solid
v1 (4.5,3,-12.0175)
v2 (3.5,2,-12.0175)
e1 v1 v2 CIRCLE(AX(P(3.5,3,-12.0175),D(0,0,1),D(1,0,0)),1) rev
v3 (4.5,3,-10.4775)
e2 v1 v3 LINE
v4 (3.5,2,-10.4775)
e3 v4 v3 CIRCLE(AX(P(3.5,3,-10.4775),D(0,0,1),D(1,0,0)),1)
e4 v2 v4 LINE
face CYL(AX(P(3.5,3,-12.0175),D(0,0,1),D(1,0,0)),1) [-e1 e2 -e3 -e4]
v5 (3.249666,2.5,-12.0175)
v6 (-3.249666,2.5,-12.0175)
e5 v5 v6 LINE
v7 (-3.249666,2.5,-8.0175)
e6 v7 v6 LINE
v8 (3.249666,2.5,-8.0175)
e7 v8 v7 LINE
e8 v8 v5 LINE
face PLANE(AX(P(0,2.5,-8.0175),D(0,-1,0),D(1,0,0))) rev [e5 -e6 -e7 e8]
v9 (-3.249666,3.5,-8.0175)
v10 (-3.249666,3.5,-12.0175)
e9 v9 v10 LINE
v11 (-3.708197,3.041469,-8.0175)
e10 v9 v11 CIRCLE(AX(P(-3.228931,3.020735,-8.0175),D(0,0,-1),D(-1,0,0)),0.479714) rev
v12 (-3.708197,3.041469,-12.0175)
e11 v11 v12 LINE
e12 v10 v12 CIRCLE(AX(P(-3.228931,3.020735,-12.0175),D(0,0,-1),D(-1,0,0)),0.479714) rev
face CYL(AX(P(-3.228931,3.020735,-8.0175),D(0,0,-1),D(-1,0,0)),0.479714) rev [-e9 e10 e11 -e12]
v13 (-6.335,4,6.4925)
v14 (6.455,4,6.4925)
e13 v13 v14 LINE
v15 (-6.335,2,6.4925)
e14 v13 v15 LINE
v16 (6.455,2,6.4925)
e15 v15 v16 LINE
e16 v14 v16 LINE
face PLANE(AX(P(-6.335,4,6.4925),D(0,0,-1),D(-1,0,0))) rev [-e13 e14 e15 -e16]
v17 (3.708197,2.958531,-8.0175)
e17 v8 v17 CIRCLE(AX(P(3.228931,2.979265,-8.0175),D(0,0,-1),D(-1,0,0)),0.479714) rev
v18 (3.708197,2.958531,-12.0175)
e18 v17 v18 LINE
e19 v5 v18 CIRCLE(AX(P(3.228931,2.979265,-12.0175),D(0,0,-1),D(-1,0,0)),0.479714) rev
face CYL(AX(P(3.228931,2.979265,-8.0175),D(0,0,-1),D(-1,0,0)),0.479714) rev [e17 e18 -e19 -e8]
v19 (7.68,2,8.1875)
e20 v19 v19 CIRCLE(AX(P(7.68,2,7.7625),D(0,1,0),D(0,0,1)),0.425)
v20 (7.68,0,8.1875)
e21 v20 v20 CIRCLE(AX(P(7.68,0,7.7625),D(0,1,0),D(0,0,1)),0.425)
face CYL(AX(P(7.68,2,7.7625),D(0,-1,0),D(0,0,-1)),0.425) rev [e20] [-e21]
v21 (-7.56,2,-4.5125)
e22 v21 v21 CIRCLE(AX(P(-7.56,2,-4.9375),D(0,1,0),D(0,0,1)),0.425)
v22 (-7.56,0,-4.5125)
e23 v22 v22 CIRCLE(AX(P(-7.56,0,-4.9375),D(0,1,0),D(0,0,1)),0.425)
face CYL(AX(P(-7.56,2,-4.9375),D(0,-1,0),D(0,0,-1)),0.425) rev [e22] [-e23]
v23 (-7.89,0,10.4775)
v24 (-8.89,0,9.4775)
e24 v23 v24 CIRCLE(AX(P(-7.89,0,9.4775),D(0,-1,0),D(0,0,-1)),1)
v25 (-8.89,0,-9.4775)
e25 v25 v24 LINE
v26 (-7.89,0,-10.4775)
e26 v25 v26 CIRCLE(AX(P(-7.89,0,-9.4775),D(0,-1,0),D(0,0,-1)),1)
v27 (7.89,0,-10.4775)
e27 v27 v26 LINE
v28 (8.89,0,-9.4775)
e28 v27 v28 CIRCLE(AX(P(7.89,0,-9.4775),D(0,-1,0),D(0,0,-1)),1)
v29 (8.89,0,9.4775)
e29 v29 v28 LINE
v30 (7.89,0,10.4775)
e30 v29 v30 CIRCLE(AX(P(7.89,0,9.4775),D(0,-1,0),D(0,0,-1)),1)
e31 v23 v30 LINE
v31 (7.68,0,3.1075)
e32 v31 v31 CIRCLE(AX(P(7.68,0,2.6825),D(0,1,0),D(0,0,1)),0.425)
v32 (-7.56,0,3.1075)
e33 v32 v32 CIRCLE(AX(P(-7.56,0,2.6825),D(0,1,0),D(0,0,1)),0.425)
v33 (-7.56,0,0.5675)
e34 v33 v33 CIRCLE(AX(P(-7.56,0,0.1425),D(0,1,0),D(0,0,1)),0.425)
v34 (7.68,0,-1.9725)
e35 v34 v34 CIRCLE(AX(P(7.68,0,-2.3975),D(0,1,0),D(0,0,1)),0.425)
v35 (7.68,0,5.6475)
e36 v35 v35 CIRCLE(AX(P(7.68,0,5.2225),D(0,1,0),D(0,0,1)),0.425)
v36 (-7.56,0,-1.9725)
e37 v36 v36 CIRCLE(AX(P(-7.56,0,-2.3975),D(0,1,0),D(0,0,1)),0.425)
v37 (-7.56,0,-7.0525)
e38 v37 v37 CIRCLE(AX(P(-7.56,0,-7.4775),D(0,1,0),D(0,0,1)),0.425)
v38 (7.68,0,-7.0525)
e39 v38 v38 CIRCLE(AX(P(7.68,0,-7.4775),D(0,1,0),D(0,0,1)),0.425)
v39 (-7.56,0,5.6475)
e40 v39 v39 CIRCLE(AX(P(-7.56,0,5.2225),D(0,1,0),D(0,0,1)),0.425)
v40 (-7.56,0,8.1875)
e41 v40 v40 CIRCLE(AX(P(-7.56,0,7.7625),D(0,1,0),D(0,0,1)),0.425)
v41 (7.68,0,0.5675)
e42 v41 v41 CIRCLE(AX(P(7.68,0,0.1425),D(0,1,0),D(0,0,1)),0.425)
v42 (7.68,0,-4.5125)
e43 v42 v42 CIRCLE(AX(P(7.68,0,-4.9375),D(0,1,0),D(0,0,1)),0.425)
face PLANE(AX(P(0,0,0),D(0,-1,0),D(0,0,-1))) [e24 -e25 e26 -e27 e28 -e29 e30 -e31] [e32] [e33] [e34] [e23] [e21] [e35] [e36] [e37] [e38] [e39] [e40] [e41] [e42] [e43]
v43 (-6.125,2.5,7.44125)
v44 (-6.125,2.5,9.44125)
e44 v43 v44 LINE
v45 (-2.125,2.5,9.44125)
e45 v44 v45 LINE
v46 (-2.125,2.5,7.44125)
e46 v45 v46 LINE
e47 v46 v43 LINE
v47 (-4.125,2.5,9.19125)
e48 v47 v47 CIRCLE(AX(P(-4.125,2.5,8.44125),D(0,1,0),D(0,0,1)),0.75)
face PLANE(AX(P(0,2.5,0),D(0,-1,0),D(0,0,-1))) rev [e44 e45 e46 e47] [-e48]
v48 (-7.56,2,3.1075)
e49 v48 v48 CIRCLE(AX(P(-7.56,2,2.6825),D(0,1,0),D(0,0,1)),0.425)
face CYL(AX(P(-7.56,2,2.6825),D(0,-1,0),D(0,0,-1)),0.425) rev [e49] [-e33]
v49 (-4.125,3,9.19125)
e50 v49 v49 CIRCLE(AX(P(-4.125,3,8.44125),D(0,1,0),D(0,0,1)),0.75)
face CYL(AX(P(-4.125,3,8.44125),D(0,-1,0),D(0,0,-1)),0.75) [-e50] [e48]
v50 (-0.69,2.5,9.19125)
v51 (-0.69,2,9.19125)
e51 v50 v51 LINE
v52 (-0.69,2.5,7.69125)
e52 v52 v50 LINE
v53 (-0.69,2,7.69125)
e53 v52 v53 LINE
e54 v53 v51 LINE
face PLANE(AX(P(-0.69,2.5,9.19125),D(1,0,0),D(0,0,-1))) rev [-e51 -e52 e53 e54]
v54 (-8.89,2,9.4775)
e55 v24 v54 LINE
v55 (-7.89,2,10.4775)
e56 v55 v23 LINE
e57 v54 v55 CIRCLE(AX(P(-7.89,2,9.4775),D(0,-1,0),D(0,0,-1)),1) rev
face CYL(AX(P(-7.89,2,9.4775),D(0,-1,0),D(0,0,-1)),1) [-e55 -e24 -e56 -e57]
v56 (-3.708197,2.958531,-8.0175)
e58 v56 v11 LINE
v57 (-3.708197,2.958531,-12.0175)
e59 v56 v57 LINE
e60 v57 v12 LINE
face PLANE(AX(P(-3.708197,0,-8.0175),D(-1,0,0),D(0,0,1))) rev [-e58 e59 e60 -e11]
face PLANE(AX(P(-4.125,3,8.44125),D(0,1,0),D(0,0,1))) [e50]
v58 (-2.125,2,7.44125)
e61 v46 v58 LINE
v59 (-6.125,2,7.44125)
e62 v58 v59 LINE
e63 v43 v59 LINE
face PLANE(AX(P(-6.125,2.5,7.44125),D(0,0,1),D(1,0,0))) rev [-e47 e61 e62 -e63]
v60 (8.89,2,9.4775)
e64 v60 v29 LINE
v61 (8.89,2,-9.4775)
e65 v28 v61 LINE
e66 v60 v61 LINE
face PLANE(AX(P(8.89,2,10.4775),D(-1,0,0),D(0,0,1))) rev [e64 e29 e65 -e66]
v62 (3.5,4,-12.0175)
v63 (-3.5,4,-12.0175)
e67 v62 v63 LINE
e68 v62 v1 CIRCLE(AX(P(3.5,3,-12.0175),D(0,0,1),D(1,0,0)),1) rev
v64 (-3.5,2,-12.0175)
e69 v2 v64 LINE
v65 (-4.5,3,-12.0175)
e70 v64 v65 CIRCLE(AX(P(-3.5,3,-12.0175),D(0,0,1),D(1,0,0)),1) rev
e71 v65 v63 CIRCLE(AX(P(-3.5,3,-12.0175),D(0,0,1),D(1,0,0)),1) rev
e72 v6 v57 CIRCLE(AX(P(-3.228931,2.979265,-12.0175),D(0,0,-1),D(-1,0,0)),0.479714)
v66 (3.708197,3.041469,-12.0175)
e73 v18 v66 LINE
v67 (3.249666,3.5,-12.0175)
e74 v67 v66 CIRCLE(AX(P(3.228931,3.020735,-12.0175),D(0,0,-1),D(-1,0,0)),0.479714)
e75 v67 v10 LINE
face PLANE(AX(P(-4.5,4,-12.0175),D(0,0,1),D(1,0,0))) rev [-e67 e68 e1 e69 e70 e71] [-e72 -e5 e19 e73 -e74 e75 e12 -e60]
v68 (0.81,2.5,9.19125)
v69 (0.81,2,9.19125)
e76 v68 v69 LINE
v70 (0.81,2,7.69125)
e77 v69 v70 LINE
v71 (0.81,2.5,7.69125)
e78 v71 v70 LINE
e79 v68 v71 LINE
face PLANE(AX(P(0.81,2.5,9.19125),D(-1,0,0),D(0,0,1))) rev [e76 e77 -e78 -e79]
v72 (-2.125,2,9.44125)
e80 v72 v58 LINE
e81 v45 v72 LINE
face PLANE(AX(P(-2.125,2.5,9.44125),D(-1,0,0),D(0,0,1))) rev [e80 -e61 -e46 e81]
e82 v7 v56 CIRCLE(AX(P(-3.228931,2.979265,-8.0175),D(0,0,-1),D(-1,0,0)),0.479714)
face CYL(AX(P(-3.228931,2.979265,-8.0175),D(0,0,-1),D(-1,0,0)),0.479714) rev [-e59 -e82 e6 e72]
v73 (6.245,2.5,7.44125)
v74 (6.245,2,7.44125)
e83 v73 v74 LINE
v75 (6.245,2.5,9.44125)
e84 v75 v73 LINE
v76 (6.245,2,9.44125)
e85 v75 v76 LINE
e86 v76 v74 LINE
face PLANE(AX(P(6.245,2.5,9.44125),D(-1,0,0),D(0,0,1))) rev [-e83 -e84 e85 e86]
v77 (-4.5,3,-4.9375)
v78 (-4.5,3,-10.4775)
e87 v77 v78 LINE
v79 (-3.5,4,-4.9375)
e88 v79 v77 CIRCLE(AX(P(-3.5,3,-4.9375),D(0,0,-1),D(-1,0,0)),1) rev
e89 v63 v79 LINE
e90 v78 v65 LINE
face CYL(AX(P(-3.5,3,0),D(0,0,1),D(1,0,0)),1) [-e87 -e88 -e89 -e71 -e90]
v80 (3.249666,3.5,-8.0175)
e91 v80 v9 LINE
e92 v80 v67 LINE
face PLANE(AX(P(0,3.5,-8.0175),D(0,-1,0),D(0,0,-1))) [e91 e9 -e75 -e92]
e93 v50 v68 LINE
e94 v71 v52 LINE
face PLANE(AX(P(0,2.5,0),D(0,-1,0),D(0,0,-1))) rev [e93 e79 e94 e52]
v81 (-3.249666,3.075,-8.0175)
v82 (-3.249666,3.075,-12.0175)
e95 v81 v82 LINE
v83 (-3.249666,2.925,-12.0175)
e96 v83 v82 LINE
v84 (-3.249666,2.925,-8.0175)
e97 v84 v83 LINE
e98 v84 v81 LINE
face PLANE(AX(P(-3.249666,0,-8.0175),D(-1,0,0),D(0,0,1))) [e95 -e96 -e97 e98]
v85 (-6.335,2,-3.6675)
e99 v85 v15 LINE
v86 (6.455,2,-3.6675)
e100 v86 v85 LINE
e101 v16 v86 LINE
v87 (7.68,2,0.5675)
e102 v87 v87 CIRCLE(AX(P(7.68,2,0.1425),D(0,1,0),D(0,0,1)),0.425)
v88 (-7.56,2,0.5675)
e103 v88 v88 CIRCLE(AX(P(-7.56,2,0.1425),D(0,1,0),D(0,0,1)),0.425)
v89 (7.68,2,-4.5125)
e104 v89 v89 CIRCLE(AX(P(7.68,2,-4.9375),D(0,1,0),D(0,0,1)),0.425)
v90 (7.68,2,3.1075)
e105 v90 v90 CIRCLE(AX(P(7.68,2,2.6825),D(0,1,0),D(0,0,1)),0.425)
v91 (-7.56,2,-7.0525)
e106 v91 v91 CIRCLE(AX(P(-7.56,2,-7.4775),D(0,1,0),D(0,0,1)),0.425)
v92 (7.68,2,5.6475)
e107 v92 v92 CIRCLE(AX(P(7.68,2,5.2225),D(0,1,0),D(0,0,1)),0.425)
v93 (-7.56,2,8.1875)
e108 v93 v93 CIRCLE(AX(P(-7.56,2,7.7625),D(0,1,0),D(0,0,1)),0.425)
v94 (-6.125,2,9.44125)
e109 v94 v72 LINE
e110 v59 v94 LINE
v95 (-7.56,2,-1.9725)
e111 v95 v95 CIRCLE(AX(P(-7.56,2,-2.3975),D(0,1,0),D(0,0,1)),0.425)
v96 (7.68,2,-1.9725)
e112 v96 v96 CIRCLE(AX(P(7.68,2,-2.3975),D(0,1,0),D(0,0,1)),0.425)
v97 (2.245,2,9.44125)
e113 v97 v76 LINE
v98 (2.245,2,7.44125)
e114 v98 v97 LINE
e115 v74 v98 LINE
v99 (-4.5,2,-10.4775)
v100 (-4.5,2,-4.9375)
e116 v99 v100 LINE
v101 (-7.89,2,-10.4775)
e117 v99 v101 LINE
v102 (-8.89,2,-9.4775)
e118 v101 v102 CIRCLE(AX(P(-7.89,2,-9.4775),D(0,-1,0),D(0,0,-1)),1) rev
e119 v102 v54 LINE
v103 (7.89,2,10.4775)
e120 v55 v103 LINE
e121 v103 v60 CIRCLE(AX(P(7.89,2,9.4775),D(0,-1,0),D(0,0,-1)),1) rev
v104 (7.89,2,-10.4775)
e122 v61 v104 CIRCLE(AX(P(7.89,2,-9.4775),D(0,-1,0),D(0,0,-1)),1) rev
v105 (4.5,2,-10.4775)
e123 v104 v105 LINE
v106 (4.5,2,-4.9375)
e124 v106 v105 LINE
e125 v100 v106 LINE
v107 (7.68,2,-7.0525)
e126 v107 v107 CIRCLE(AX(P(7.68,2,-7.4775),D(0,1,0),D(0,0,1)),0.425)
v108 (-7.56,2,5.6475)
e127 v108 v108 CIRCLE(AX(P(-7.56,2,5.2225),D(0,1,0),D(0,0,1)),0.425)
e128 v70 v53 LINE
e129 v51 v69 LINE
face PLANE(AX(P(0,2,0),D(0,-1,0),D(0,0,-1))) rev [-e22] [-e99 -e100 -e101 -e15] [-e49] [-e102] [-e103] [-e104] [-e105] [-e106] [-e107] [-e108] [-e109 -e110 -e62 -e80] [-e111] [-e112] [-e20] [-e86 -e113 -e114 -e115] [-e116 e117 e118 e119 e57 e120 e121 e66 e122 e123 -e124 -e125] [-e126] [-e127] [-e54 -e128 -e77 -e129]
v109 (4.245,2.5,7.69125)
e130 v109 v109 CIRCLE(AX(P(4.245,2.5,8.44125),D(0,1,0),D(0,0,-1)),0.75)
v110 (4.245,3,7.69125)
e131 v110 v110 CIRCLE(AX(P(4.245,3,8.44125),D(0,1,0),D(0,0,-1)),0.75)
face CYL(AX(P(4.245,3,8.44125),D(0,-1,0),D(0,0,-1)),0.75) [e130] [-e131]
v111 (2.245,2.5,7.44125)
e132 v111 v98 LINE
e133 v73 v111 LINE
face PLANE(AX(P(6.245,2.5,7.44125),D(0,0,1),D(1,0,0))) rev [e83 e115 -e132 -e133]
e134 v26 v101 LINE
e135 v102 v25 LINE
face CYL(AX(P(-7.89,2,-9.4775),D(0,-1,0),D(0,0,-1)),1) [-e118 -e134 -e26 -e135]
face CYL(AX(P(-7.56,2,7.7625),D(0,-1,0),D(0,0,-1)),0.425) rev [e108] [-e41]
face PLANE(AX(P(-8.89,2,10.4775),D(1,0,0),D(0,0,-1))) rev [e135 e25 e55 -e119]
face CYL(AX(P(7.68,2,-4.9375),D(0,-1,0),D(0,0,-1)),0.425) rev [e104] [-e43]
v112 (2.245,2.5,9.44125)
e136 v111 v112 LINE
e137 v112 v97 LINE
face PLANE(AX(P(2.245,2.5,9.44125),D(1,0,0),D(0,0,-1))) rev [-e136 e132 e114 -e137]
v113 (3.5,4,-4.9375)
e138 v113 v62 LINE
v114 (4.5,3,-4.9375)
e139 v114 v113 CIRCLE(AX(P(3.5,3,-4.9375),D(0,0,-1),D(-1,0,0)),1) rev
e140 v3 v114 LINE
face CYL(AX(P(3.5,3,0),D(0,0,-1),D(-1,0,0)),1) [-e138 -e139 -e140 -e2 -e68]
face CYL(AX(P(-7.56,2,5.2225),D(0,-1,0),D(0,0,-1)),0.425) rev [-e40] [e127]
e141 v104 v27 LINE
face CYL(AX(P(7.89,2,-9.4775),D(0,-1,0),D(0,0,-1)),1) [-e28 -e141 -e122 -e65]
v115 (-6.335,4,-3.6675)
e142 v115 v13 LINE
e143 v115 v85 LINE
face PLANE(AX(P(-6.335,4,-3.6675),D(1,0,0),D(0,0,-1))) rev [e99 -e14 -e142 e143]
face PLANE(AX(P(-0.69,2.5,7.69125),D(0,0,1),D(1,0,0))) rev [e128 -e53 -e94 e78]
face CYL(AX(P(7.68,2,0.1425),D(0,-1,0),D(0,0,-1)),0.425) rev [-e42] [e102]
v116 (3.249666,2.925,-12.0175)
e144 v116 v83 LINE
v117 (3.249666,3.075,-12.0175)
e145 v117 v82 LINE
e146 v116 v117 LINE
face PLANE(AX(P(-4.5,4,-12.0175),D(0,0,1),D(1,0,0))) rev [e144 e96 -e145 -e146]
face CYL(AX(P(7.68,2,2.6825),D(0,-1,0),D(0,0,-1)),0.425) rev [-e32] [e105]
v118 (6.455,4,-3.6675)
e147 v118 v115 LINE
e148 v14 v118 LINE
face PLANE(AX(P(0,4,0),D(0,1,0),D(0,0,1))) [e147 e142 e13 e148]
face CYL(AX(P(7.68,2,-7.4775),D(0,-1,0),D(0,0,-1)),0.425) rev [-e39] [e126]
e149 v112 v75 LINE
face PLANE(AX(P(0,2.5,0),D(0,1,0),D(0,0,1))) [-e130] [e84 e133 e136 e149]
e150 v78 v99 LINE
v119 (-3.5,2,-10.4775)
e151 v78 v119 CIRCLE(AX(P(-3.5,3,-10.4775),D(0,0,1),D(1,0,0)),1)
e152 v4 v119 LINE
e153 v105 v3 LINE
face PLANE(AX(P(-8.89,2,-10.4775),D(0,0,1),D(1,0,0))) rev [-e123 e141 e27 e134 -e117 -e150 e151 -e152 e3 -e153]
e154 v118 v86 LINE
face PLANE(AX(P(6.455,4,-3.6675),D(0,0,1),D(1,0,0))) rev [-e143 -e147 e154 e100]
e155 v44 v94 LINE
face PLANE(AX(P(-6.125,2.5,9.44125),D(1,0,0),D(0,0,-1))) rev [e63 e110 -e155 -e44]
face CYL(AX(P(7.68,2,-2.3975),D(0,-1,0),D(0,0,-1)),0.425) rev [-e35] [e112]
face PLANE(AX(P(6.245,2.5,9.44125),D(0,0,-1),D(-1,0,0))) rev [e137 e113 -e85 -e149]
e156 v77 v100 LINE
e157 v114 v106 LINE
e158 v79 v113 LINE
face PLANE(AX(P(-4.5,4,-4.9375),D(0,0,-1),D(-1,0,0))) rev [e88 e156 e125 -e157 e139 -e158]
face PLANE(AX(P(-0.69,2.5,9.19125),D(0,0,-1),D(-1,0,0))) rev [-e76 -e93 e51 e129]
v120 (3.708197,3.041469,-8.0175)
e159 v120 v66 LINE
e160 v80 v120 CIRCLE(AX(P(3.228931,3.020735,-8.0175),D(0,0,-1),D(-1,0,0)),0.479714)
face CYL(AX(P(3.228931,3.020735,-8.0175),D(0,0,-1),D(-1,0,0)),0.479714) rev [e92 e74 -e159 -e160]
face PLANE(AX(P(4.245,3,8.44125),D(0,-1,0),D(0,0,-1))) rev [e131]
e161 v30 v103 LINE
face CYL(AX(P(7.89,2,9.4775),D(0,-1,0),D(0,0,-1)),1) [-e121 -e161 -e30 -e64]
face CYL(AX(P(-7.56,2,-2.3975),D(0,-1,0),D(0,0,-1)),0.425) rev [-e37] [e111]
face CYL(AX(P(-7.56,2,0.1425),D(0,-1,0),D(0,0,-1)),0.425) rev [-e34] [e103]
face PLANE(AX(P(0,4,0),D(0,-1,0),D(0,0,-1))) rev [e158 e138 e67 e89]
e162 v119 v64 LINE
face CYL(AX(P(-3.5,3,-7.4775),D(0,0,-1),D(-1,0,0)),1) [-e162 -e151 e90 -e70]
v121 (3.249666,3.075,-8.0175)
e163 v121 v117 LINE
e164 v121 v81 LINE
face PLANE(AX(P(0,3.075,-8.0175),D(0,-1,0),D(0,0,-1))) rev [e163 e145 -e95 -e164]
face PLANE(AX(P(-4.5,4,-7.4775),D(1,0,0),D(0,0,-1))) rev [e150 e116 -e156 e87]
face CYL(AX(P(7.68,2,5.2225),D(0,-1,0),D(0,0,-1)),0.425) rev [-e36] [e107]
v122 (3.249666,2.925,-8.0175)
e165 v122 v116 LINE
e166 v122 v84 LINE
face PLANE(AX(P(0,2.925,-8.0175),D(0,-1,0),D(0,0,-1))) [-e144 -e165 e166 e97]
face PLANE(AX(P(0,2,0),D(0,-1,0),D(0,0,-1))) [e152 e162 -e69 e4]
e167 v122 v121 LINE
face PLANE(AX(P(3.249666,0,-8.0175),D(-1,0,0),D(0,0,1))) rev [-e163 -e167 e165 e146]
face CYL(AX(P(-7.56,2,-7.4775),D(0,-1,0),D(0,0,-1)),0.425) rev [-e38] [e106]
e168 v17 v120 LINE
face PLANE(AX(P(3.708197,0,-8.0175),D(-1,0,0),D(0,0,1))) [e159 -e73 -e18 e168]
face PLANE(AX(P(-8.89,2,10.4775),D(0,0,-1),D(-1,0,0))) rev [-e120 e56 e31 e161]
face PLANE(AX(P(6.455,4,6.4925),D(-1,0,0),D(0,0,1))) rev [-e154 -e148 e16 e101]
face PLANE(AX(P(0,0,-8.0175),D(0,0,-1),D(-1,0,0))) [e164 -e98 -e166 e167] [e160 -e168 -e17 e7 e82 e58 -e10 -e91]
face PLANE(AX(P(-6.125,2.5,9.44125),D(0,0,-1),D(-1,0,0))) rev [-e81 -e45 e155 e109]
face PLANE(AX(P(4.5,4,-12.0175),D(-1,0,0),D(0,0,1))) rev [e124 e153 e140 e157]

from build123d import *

# Parameters (mm, degrees)
ESQUISSE1_W             = 17.78
ESQUISSE1_H             = 20.955
ESQUISSE1_R             = 0.425
BOSS_EXTRU_1_DEPTH      = 2
BOSS_EXTRU_2_DEPTH      = 2
CONG_1_R                = 1
ESQUISSE3_W             = 6.499332414
ESQUISSE3_H             = 0.15
ENL_V_MAT_EXTRU_1_DEPTH = 4
CONG_2_R                = 1
ESQUISSE4_W             = 12.79
ESQUISSE4_H             = 10.16
BOSS_EXTRU_3_DEPTH      = 2
ESQUISSE5_W             = 4
ESQUISSE5_H             = 2
ESQUISSE5_W_2           = 1.5
ESQUISSE5_H_2           = 1.5
BOSS_EXTRU_4_DEPTH      = 0.5
ESQUISSE6_R             = 0.75
BOSS_EXTRU_5_DEPTH      = 0.5


with BuildPart() as part:
    # Esquisse1 → Boss.-Extru.1 (new body)
    with BuildSketch(Plane(origin=(0, 0, 0), x_dir=(1, 0, 0), z_dir=(0, 1, 0))):
        Rectangle(ESQUISSE1_W, ESQUISSE1_H)
        with Locations(Location((-7.56, 7.4775, 0), (0, 0, 270))):
            Circle(ESQUISSE1_R, mode=Mode.SUBTRACT)
        with Locations(Location((7.68, 7.4775, 0), (0, 0, 270))):
            Circle(ESQUISSE1_R, mode=Mode.SUBTRACT)
        with Locations(Location((7.68, 4.9375, 0), (0, 0, 270))):
            Circle(ESQUISSE1_R, mode=Mode.SUBTRACT)
        with Locations(Location((7.68, 2.3975, 0), (0, 0, 270))):
            Circle(ESQUISSE1_R, mode=Mode.SUBTRACT)
        with Locations(Location((7.68, -0.1425, 0), (0, 0, 270))):
            Circle(ESQUISSE1_R, mode=Mode.SUBTRACT)
        with Locations(Location((7.68, -2.6825, 0), (0, 0, 270))):
            Circle(ESQUISSE1_R, mode=Mode.SUBTRACT)
        with Locations(Location((7.68, -5.2225, 0), (0, 0, 270))):
            Circle(ESQUISSE1_R, mode=Mode.SUBTRACT)
        with Locations(Location((7.68, -7.7625, 0), (0, 0, 270))):
            Circle(ESQUISSE1_R, mode=Mode.SUBTRACT)
        with Locations(Location((-7.56, 4.9375, 0), (0, 0, 270))):
            Circle(ESQUISSE1_R, mode=Mode.SUBTRACT)
        with Locations(Location((-7.56, 2.3975, 0), (0, 0, 270))):
            Circle(ESQUISSE1_R, mode=Mode.SUBTRACT)
        with Locations(Location((-7.56, -0.1425, 0), (0, 0, 270))):
            Circle(ESQUISSE1_R, mode=Mode.SUBTRACT)
        with Locations(Location((-7.56, -2.6825, 0), (0, 0, 270))):
            Circle(ESQUISSE1_R, mode=Mode.SUBTRACT)
        with Locations(Location((-7.56, -5.2225, 0), (0, 0, 270))):
            Circle(ESQUISSE1_R, mode=Mode.SUBTRACT)
        with Locations(Location((-7.56, -7.7625, 0), (0, 0, 270))):
            Circle(ESQUISSE1_R, mode=Mode.SUBTRACT)
    extrude(amount=BOSS_EXTRU_1_DEPTH)

    # Esquisse2 → Boss.-Extru.2 (add)
    with BuildSketch(Plane(origin=(0, 2, 0), x_dir=(1, 0, 0), z_dir=(0, 1, 0))):
        Polygon((-4.5, 12.0175), (4.5, 12.0175), (4.5, 7.4775), (4.5, 4.9375), (-4.5, 4.9375), (-4.5, 7.4775), align=None)
    extrude(amount=BOSS_EXTRU_2_DEPTH)

    # Congé1
    cong_1_edges = [part.edges().sort_by_distance(p)[0] for p in [
        (-4.5, 2, -11.2475),
        (4.5, 2, -11.2475),
        (-4.5, 4, -8.4775),
        (4.5, 4, -8.4775),
    ]]
    fillet(cong_1_edges, radius=CONG_1_R - 0.0001)  # a hair under: the kernel refuses the full size

    # Esquisse3 → Enlèv. mat.-Extru.1 (cut)
    with BuildSketch(Plane(origin=(0, 0, -12.0175), x_dir=(-1, 0, 0), z_dir=(0, 0, -1))):
        with BuildLine():
            ThreePointArc((-3.708196785, 2.958530578), (-3.568140241, 2.640056544), (-3.249666207, 2.5))
            Line((-3.249666207, 2.5), (3.249666207, 2.5))
            ThreePointArc((3.249666207, 2.5), (3.568140241, 2.640056544), (3.708196785, 2.958530578))
            Line((3.708196785, 2.958530578), (3.708196785, 3))
            Line((3.708196785, 3), (3.708196785, 3.041469422))
            ThreePointArc((3.708196785, 3.041469422), (3.568140241, 3.359943456), (3.249666207, 3.5))
            Line((3.249666207, 3.5), (-3.249666207, 3.5))
            ThreePointArc((-3.249666207, 3.5), (-3.568140241, 3.359943456), (-3.708196785, 3.041469422))
            Line((-3.708196785, 3.041469422), (-3.708196785, 3))
            Line((-3.708196785, 3), (-3.708196785, 2.958530578))
        make_face()
        with Locations((0, 3)):
            Rectangle(ESQUISSE3_W, ESQUISSE3_H, mode=Mode.SUBTRACT)
    extrude(amount=-ENL_V_MAT_EXTRU_1_DEPTH, mode=Mode.SUBTRACT)

    # Congé2
    cong_2_edges = [part.edges().sort_by_distance(p)[0] for p in [
        (8.89, 1, 10.4775),
        (-8.89, 1, 10.4775),
        (-8.89, 1, -10.4775),
        (8.89, 1, -10.4775),
    ]]
    fillet(cong_2_edges, radius=CONG_2_R)

    # Esquisse4 → Boss.-Extru.3 (add)
    with BuildSketch(Plane(origin=(0, 2, 0), x_dir=(1, 0, 0), z_dir=(0, 1, 0))):
        with Locations((0.06, -1.4125)):
            Rectangle(ESQUISSE4_W, ESQUISSE4_H)
    extrude(amount=BOSS_EXTRU_3_DEPTH)

    # Esquisse5 → Boss.-Extru.4 (add)
    with BuildSketch(Plane(origin=(0, 2, 0), x_dir=(1, 0, 0), z_dir=(0, 1, 0))):
        with Locations((-4.125, -8.44125)):
            Rectangle(ESQUISSE5_W, ESQUISSE5_H)
        with Locations((4.245, -8.44125)):
            Rectangle(ESQUISSE5_W, ESQUISSE5_H)
        with Locations((0.06, -8.44125)):
            Rectangle(ESQUISSE5_W_2, ESQUISSE5_H_2)
    extrude(amount=BOSS_EXTRU_4_DEPTH)

    # Esquisse6 → Boss.-Extru.5 (add)
    with BuildSketch(Plane(origin=(0, 2.5, 0), x_dir=(1, 0, 0), z_dir=(0, 1, 0))):
        with Locations(Location((-4.125, -8.44125, 0), (0, 0, 270))):
            Circle(ESQUISSE6_R)
        with Locations(Location((4.245, -8.44125, 0), (0, 0, 90))):
            Circle(ESQUISSE6_R)
    extrude(amount=BOSS_EXTRU_5_DEPTH)


solid = part.part
